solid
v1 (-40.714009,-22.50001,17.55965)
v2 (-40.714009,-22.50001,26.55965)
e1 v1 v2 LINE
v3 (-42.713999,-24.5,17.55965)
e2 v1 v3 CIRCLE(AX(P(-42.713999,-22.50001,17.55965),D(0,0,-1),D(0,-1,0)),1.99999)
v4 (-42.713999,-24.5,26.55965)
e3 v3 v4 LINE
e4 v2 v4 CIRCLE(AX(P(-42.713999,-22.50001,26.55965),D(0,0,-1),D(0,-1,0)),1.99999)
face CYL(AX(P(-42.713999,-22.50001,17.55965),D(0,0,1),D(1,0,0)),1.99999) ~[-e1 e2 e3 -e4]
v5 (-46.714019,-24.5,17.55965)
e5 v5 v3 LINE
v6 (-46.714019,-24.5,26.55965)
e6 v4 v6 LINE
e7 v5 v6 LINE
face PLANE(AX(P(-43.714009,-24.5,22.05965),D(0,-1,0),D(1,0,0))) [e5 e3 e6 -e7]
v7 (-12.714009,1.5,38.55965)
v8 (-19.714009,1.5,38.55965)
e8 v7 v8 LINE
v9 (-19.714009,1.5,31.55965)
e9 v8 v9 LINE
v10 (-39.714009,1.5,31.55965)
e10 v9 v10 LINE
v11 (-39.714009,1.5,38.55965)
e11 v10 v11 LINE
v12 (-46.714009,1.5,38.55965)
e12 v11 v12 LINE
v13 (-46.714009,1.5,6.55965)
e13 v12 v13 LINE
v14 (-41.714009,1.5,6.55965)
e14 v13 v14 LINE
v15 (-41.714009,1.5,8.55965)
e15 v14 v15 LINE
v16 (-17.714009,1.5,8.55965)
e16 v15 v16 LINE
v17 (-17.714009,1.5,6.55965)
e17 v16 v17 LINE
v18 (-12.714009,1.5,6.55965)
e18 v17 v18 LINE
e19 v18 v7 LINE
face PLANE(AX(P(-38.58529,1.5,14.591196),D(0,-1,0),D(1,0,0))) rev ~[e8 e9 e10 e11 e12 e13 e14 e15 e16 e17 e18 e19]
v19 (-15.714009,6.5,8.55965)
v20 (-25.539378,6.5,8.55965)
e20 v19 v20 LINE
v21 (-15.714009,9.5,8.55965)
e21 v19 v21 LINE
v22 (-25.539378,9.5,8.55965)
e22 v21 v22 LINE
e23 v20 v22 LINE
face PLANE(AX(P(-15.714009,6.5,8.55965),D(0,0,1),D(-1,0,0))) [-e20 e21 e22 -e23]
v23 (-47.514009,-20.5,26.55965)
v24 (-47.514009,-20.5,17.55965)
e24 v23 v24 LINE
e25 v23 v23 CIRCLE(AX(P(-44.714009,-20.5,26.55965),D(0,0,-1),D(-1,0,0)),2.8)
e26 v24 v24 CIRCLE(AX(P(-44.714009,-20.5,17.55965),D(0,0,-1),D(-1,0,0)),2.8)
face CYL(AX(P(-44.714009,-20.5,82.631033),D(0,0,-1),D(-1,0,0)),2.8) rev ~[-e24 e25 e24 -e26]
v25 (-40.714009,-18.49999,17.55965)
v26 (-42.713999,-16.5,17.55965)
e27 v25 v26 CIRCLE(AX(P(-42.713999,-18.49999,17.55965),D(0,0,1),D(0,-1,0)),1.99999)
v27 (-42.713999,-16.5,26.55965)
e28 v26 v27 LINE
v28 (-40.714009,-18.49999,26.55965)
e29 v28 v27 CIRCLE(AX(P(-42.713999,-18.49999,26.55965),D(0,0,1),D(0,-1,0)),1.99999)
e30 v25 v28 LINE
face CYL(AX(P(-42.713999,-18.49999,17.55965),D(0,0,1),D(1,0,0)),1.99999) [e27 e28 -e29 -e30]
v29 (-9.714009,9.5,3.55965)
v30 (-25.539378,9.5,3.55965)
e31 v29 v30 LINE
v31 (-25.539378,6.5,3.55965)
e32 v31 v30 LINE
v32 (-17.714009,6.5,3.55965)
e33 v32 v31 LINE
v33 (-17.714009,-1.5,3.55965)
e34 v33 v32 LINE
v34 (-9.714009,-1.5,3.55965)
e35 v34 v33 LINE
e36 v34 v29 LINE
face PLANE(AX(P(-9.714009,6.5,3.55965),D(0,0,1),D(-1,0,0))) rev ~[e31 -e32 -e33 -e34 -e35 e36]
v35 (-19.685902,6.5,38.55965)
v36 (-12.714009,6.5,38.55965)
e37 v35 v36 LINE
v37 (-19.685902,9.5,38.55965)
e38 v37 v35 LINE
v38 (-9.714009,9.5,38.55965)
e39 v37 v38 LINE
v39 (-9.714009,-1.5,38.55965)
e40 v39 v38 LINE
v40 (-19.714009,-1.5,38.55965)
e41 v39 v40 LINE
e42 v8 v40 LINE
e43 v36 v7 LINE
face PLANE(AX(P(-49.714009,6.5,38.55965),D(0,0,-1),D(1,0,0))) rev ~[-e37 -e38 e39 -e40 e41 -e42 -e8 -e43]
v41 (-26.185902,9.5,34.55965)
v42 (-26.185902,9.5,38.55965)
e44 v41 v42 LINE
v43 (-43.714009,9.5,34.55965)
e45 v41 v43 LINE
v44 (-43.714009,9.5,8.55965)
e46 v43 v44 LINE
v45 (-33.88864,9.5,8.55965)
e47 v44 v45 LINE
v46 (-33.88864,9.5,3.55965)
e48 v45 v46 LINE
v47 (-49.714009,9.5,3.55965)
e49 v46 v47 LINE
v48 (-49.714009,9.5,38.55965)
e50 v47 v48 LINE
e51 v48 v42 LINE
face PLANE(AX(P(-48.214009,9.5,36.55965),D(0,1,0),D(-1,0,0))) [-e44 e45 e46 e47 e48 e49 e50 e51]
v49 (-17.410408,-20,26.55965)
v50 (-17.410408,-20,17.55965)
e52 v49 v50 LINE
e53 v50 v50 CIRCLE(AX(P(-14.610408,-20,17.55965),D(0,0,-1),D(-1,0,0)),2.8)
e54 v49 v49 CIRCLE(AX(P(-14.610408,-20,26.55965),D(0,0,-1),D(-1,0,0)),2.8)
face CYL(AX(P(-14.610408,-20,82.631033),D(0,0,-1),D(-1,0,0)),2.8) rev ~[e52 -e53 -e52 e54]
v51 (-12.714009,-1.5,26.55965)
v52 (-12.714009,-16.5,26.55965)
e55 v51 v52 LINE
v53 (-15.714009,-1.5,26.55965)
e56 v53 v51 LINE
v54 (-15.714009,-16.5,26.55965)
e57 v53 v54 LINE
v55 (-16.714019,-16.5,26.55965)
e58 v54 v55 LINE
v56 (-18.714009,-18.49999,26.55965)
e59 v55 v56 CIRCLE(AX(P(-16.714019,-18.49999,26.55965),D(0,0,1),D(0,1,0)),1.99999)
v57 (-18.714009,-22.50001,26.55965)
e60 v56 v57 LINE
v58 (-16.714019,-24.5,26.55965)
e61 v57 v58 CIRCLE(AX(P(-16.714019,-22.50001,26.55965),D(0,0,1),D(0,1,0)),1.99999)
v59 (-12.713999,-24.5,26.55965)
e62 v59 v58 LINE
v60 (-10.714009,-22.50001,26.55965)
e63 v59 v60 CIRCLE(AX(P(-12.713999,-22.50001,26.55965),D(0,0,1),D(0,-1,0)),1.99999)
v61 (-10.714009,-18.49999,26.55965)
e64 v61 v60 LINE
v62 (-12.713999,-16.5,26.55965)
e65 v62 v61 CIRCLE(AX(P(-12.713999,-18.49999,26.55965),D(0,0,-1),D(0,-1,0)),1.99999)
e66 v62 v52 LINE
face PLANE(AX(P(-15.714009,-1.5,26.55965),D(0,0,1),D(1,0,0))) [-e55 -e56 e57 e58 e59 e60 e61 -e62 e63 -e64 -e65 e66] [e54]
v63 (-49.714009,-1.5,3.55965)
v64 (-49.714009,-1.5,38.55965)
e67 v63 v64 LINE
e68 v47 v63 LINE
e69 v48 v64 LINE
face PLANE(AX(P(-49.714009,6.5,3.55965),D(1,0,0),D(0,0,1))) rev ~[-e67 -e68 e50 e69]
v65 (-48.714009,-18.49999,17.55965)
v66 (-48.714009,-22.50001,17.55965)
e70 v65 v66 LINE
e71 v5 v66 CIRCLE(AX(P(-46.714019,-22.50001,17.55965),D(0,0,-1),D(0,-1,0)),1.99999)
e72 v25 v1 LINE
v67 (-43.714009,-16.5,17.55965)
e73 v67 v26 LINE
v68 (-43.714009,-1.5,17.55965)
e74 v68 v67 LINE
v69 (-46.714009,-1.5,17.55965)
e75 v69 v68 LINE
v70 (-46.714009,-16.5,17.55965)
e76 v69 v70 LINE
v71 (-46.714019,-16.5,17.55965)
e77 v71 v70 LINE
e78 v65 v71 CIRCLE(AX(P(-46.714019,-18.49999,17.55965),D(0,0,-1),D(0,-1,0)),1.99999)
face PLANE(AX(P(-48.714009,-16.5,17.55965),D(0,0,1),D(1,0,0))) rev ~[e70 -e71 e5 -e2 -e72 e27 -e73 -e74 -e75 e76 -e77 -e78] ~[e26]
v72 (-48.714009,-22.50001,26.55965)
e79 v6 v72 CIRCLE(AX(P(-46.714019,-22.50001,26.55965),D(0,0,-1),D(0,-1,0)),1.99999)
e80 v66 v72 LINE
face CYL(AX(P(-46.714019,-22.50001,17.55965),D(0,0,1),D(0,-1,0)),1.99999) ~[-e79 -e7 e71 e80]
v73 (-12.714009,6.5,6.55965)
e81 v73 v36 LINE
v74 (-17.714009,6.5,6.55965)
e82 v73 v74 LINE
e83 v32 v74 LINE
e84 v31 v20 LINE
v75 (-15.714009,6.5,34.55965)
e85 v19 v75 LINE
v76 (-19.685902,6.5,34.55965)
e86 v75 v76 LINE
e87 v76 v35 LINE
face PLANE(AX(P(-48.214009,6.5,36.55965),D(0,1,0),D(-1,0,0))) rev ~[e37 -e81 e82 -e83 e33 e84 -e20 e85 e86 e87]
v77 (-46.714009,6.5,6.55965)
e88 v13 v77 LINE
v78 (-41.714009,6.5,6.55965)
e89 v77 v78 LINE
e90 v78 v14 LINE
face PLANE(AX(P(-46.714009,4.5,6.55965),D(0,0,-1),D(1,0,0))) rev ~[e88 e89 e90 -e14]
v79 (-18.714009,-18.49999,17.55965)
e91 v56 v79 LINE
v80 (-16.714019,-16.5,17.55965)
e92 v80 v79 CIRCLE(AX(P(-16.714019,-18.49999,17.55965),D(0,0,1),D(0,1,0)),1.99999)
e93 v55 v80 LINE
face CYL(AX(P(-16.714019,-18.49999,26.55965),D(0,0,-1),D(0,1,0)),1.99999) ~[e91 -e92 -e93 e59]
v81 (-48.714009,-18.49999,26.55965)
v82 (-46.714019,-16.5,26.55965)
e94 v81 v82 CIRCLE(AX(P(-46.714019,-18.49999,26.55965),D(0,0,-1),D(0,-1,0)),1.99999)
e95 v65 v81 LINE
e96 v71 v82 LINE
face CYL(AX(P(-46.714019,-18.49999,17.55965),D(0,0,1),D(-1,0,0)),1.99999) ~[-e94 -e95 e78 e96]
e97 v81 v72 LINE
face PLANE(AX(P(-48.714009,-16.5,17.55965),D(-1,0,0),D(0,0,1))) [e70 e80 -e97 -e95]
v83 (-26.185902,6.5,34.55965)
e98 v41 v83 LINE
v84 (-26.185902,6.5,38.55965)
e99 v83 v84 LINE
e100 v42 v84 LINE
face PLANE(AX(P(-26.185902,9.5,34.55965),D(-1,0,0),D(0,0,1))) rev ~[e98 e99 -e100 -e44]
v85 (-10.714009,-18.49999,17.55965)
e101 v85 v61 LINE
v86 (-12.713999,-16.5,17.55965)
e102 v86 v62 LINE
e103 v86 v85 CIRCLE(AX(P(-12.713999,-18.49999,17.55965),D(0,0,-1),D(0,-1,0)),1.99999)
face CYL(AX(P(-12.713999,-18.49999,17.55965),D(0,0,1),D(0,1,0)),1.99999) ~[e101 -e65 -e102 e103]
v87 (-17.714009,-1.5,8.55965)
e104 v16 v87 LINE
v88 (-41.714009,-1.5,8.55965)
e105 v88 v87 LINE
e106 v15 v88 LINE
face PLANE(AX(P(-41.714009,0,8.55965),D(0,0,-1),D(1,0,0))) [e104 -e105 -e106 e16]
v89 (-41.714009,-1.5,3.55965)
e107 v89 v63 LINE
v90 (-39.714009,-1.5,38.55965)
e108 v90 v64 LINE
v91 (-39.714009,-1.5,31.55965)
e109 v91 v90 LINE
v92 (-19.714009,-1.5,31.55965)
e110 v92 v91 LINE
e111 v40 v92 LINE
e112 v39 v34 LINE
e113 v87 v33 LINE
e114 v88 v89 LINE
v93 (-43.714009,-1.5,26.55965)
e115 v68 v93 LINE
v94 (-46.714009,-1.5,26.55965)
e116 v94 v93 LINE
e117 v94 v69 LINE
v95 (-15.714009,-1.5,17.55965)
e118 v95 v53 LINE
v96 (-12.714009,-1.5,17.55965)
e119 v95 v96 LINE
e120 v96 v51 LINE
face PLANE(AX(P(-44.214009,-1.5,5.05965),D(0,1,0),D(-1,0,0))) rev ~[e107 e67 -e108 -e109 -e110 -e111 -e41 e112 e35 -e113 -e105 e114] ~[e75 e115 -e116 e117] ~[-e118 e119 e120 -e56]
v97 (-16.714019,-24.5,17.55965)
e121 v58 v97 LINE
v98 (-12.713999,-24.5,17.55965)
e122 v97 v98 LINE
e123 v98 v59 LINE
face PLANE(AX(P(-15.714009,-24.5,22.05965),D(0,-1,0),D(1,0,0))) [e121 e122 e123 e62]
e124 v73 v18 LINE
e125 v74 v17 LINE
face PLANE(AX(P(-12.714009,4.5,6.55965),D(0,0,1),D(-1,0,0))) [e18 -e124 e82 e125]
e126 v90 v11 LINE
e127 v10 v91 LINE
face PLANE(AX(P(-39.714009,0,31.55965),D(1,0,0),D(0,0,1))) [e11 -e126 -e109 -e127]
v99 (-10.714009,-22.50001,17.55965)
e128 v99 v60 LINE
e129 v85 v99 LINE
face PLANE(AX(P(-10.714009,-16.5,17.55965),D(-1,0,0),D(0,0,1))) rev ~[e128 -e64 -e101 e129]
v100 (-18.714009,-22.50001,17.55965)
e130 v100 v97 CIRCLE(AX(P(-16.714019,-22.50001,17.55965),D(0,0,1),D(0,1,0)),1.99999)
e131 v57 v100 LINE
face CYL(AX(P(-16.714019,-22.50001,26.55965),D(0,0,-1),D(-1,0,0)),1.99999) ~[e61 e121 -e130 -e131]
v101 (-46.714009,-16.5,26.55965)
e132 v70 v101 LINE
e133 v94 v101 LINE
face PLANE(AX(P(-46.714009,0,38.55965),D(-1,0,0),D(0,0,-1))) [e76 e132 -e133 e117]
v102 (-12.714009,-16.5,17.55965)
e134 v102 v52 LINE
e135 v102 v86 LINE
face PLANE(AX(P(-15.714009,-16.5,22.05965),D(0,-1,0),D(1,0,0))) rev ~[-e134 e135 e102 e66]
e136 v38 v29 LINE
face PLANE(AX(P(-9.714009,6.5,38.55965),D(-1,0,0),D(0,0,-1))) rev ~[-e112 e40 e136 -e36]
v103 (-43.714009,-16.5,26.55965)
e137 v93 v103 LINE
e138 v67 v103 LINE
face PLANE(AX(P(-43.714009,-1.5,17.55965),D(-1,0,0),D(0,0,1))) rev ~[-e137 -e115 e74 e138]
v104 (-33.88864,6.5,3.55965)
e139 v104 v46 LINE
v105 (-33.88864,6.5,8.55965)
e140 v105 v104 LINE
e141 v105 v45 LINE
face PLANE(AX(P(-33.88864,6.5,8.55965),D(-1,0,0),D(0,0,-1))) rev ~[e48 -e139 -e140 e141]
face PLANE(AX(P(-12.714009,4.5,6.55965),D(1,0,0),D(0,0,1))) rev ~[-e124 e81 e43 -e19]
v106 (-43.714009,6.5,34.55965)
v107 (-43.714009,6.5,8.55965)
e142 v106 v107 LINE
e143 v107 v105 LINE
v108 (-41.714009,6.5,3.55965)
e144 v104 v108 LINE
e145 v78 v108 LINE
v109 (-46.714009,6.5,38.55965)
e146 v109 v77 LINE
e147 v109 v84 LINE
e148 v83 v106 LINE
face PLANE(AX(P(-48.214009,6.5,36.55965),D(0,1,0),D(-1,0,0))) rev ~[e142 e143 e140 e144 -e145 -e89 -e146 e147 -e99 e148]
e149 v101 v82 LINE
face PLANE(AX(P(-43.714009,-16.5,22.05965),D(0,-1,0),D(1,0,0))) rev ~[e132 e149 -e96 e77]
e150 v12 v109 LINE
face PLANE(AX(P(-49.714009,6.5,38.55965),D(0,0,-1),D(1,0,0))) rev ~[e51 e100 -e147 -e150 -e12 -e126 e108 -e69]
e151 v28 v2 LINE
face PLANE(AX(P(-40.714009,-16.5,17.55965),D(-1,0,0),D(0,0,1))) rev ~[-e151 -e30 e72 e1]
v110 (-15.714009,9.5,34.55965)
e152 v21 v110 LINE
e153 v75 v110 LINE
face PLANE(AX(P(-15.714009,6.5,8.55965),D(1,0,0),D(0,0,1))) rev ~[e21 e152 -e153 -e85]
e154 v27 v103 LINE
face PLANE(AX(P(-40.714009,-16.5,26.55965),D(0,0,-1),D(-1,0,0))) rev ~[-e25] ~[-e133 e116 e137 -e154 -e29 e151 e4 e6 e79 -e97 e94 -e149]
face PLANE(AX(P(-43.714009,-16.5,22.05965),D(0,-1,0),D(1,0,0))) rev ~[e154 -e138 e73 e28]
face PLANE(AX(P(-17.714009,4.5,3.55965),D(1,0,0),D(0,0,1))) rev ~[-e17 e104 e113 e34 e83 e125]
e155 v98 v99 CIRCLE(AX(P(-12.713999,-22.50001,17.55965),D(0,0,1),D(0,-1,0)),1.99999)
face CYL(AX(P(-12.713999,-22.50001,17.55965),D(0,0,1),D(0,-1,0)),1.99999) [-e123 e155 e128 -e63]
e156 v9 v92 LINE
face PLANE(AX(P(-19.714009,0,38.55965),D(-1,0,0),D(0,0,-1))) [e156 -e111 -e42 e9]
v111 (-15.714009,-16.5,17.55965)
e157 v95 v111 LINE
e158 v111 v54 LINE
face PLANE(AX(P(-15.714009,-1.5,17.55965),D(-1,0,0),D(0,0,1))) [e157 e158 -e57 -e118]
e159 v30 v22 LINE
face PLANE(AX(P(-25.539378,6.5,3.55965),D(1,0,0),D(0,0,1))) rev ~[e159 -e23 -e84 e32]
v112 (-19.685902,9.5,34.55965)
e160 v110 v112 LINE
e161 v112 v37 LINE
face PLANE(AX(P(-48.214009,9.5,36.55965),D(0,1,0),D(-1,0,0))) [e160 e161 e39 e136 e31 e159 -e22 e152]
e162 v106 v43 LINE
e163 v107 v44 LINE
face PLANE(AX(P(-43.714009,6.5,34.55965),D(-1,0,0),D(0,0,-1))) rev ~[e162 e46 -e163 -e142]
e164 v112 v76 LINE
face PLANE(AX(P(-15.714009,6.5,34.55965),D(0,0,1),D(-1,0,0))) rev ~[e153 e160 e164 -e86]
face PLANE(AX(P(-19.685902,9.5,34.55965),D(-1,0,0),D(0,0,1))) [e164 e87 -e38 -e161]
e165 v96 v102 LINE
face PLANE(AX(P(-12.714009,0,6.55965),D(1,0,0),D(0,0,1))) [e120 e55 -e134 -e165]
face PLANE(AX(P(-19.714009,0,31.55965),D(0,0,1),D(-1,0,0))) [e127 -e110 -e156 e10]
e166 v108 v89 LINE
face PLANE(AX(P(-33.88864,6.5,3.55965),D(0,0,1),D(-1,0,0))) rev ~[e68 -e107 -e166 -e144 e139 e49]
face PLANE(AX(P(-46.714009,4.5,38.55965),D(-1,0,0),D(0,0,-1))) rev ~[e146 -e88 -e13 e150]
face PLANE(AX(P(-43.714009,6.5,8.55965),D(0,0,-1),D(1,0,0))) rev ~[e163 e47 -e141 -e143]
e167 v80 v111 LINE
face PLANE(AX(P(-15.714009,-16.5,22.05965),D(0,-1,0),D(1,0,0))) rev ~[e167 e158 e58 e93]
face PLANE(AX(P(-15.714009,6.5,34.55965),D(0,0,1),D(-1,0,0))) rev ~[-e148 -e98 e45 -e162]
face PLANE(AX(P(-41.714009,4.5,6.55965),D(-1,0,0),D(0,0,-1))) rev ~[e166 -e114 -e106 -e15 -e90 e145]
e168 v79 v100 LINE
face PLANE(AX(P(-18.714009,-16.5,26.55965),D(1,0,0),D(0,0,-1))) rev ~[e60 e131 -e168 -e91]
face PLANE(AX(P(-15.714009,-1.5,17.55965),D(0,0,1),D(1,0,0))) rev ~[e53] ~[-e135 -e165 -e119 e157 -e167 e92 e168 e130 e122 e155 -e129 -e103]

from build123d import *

# Parameters (mm, degrees)
F1_DEPTH  = 1.5
F2_W      = 3
F2_H      = 9
F3_DEPTH  = 15
F4_W      = 2
F4_H      = 9
F5_DEPTH  = 8
F7_D      = 5.6
F8_R      = 1.99999
F9_W      = 5
F9_H      = 3
F10_DEPTH = 3
F12_DEPTH = 2
F13_DEPTH = 2
F14_W     = 3
F14_H     = 4
F14_W_2   = 2
F14_H_2   = 3
F14_W_3   = 9.8253687732
F14_H_3   = 5
F15_DEPTH = 3
F16_W     = 6.5
F16_H     = 4
F17_DEPTH = 3


# Not quite as in the source:
# - a fillet or chamfer is up to 0.001 mm smaller than in the source, because OpenCascade refuses the exact size


with BuildPart() as f1:
    # F0 (on Front) → F1 (new body, symmetric)
    with BuildSketch(Plane.XZ):
        Polygon((-46.7140089311, 21.8801796436), (-46.7140089311, 6.5596503988), (-41.7140089311, 6.5596503988), (-41.7140089311, 8.5596503988), (-29.7140089311, 8.5596503988), (-29.7140089311, 21.8801796436), align=None)
        Polygon((-46.7140089311, 38.5596503988), (-46.7140089311, 21.8801796436), (-29.7140089311, 21.8801796436), (-29.7140089311, 31.5596503988), (-39.7140089311, 31.5596503988), (-39.7140089311, 38.5596503988), align=None)
        Polygon((-12.7140089311, 21.8801796436), (-29.7140089311, 21.8801796436), (-29.7140089311, 8.5596503988), (-17.7140089311, 8.5596503988), (-17.7140089311, 6.5596503988), (-12.7140089311, 6.5596503988), align=None)
        Polygon((-29.7140089311, 31.5596503988), (-29.7140089311, 21.8801796436), (-12.7140089311, 21.8801796436), (-12.7140089311, 38.5596503988), (-19.7140089311, 38.5596503988), (-19.7140089311, 31.5596503988), align=None)
    extrude(amount=F1_DEPTH, both=True)

    # F2 (on face) → F3 (join)
    with BuildSketch(Plane.XZ.offset(1.5)):
        with Locations((-45.2140089311, 22.0596503988)):
            Rectangle(F2_W, F2_H)
        with Locations((-14.2140089311, 22.0596503988)):
            Rectangle(F2_W, F2_H)
    extrude(amount=F3_DEPTH)

    # F4 (on face) → F5 (join)
    with BuildSketch(Plane.XZ.offset(16.5)):
        Polygon((-44.7140089311, 26.5596503988), (-46.7140089311, 26.5596503988), (-46.7140089311, 17.5596503988), (-43.7140089311, 17.5596503988), (-40.7140089311, 17.5596503988), (-40.7140089311, 26.5596503988), (-43.7140089311, 26.5596503988), align=None)
        with Locations((-47.7140089311, 22.0596503988)):
            Rectangle(F4_W, F4_H)
        Polygon((-12.7140089311, 17.5596503988), (-12.7140089311, 26.5596503988), (-14.7140089311, 26.5596503988), (-15.7140089311, 26.5596503988), (-18.7140089311, 26.5596503988), (-18.7140089311, 17.5596503988), (-15.7140089311, 17.5596503988), align=None)
        with Locations((-11.7140089311, 22.0596503988)):
            Rectangle(F4_W, F4_H)
    extrude(amount=F5_DEPTH)

    # F7 (through all)
    with Locations(Plane.XY.offset(26.5596503988)):
        with Locations((-44.7140089311, -20.5), (-14.6104083322, -20)):
            Hole(F7_D / 2)

    # F8 (radius 2 in the source; OpenCascade refuses exactly that, so slightly less here)
    f8_edges = [f1.edges().sort_by_distance(p)[0] for p in [
        (-10.714009, -16.5, 22.05965),
        (-18.714009, -16.5, 22.05965),
        (-18.714009, -24.5, 22.05965),
        (-10.714009, -24.5, 22.05965),
        (-48.714009, -24.5, 22.05965),
        (-48.714009, -16.5, 22.05965),
        (-40.714009, -16.5, 22.05965),
        (-40.714009, -24.5, 22.05965),
    ]]
    fillet(f8_edges, radius=F8_R)

    # F9 (on face) → F10 (join, symmetric)
    with BuildSketch(Plane(origin=(0, 1.5, 0), x_dir=(-1, 0, 0), z_dir=(0, 1, 0))):
        Polygon((12.7140089311, 6.5596503988), (12.7140089311, 38.5596503988), (9.7140089311, 38.5596503988), (9.7140089311, 3.5596503988), (12.7140089311, 3.5596503988), align=None)
        with Locations((15.2140089311, 5.0596503988)):
            Rectangle(F9_W, F9_H)
        with Locations((44.2140089311, 5.0596503988)):
            Rectangle(F9_W, F9_H)
        Polygon((49.7140089311, 38.5596503988), (46.7140089311, 38.5596503988), (46.7140089311, 6.5596503988), (46.7140089311, 3.5596503988), (49.7140089311, 3.5596503988), align=None)
    extrude(amount=F10_DEPTH, both=True)

    # F11 (on face) → F12 (join)
    with BuildSketch(Plane(origin=(0, 4.5, 0), x_dir=(-1, 0, 0), z_dir=(0, 1, 0))):
        Polygon((49.7140089311, 3.5596503988), (49.7140089311, 38.5596503988), (46.7140089311, 38.5596503988), (46.7140089311, 6.5596503988), (41.7140089311, 6.5596503988), (41.7140089311, 3.5596503988), align=None)
    extrude(amount=F12_DEPTH)

    # F13 (add): a face of the model
    f13_faces = [f1.faces().sort_by_distance(p)[0] for p in [
        (-11.7140089311, 4.5, 19.0596503988),
    ]]
    extrude(f13_faces, amount=F13_DEPTH)

    # F14 (on face) → F15 (join)
    with BuildSketch(Plane(origin=(0, 6.5, 0), x_dir=(-1, 0, 0), z_dir=(0, 1, 0))):
        with Locations((48.2140089311, 36.5596503988)):
            Rectangle(F14_W, F14_H)
        Polygon((46.7140089311, 34.5596503988), (46.7140089311, 38.5596503988), (9.7140089311, 38.5596503988), (9.7140089311, 34.5596503988), (15.7140089311, 34.5596503988), (43.7140089311, 34.5596503988), align=None)
        Polygon((49.7140089311, 3.5596503988), (49.7140089311, 34.5596503988), (46.7140089311, 34.5596503988), (46.7140089311, 6.5596503988), (43.7140089311, 6.5596503988), (43.7140089311, 3.5596503988), align=None)
        Polygon((46.7140089311, 6.5596503988), (46.7140089311, 34.5596503988), (43.7140089311, 34.5596503988), (43.7140089311, 8.5596503988), (43.7140089311, 6.5596503988), align=None)
        Polygon((15.7140089311, 34.5596503988), (9.7140089311, 34.5596503988), (9.7140089311, 3.5596503988), (15.7140089311, 3.5596503988), (15.7140089311, 8.5596503988), align=None)
        with Locations((42.7140089311, 5.0596503988)):
            Rectangle(F14_W_2, F14_H_2)
        Polygon((43.7140089311, 6.5596503988), (43.7140089311, 8.5596503988), (33.8886401579, 8.5596503988), (33.8886401579, 3.5596503988), (41.7140089311, 3.5596503988), (41.7140089311, 6.5596503988), align=None)
        with Locations((20.6266933177, 6.0596503988)):
            Rectangle(F14_W_3, F14_H_3)
    extrude(amount=F15_DEPTH)

    # F16 (on face) → F17 (cut)
    with BuildSketch(Plane(origin=(0, 9.5, 0), x_dir=(-1, 0, 0), z_dir=(0, 1, 0))):
        with Locations((22.9359017015, 36.5596503988)):
            Rectangle(F16_W, F16_H)
    extrude(amount=-F17_DEPTH, mode=Mode.SUBTRACT)


solid = f1.part
